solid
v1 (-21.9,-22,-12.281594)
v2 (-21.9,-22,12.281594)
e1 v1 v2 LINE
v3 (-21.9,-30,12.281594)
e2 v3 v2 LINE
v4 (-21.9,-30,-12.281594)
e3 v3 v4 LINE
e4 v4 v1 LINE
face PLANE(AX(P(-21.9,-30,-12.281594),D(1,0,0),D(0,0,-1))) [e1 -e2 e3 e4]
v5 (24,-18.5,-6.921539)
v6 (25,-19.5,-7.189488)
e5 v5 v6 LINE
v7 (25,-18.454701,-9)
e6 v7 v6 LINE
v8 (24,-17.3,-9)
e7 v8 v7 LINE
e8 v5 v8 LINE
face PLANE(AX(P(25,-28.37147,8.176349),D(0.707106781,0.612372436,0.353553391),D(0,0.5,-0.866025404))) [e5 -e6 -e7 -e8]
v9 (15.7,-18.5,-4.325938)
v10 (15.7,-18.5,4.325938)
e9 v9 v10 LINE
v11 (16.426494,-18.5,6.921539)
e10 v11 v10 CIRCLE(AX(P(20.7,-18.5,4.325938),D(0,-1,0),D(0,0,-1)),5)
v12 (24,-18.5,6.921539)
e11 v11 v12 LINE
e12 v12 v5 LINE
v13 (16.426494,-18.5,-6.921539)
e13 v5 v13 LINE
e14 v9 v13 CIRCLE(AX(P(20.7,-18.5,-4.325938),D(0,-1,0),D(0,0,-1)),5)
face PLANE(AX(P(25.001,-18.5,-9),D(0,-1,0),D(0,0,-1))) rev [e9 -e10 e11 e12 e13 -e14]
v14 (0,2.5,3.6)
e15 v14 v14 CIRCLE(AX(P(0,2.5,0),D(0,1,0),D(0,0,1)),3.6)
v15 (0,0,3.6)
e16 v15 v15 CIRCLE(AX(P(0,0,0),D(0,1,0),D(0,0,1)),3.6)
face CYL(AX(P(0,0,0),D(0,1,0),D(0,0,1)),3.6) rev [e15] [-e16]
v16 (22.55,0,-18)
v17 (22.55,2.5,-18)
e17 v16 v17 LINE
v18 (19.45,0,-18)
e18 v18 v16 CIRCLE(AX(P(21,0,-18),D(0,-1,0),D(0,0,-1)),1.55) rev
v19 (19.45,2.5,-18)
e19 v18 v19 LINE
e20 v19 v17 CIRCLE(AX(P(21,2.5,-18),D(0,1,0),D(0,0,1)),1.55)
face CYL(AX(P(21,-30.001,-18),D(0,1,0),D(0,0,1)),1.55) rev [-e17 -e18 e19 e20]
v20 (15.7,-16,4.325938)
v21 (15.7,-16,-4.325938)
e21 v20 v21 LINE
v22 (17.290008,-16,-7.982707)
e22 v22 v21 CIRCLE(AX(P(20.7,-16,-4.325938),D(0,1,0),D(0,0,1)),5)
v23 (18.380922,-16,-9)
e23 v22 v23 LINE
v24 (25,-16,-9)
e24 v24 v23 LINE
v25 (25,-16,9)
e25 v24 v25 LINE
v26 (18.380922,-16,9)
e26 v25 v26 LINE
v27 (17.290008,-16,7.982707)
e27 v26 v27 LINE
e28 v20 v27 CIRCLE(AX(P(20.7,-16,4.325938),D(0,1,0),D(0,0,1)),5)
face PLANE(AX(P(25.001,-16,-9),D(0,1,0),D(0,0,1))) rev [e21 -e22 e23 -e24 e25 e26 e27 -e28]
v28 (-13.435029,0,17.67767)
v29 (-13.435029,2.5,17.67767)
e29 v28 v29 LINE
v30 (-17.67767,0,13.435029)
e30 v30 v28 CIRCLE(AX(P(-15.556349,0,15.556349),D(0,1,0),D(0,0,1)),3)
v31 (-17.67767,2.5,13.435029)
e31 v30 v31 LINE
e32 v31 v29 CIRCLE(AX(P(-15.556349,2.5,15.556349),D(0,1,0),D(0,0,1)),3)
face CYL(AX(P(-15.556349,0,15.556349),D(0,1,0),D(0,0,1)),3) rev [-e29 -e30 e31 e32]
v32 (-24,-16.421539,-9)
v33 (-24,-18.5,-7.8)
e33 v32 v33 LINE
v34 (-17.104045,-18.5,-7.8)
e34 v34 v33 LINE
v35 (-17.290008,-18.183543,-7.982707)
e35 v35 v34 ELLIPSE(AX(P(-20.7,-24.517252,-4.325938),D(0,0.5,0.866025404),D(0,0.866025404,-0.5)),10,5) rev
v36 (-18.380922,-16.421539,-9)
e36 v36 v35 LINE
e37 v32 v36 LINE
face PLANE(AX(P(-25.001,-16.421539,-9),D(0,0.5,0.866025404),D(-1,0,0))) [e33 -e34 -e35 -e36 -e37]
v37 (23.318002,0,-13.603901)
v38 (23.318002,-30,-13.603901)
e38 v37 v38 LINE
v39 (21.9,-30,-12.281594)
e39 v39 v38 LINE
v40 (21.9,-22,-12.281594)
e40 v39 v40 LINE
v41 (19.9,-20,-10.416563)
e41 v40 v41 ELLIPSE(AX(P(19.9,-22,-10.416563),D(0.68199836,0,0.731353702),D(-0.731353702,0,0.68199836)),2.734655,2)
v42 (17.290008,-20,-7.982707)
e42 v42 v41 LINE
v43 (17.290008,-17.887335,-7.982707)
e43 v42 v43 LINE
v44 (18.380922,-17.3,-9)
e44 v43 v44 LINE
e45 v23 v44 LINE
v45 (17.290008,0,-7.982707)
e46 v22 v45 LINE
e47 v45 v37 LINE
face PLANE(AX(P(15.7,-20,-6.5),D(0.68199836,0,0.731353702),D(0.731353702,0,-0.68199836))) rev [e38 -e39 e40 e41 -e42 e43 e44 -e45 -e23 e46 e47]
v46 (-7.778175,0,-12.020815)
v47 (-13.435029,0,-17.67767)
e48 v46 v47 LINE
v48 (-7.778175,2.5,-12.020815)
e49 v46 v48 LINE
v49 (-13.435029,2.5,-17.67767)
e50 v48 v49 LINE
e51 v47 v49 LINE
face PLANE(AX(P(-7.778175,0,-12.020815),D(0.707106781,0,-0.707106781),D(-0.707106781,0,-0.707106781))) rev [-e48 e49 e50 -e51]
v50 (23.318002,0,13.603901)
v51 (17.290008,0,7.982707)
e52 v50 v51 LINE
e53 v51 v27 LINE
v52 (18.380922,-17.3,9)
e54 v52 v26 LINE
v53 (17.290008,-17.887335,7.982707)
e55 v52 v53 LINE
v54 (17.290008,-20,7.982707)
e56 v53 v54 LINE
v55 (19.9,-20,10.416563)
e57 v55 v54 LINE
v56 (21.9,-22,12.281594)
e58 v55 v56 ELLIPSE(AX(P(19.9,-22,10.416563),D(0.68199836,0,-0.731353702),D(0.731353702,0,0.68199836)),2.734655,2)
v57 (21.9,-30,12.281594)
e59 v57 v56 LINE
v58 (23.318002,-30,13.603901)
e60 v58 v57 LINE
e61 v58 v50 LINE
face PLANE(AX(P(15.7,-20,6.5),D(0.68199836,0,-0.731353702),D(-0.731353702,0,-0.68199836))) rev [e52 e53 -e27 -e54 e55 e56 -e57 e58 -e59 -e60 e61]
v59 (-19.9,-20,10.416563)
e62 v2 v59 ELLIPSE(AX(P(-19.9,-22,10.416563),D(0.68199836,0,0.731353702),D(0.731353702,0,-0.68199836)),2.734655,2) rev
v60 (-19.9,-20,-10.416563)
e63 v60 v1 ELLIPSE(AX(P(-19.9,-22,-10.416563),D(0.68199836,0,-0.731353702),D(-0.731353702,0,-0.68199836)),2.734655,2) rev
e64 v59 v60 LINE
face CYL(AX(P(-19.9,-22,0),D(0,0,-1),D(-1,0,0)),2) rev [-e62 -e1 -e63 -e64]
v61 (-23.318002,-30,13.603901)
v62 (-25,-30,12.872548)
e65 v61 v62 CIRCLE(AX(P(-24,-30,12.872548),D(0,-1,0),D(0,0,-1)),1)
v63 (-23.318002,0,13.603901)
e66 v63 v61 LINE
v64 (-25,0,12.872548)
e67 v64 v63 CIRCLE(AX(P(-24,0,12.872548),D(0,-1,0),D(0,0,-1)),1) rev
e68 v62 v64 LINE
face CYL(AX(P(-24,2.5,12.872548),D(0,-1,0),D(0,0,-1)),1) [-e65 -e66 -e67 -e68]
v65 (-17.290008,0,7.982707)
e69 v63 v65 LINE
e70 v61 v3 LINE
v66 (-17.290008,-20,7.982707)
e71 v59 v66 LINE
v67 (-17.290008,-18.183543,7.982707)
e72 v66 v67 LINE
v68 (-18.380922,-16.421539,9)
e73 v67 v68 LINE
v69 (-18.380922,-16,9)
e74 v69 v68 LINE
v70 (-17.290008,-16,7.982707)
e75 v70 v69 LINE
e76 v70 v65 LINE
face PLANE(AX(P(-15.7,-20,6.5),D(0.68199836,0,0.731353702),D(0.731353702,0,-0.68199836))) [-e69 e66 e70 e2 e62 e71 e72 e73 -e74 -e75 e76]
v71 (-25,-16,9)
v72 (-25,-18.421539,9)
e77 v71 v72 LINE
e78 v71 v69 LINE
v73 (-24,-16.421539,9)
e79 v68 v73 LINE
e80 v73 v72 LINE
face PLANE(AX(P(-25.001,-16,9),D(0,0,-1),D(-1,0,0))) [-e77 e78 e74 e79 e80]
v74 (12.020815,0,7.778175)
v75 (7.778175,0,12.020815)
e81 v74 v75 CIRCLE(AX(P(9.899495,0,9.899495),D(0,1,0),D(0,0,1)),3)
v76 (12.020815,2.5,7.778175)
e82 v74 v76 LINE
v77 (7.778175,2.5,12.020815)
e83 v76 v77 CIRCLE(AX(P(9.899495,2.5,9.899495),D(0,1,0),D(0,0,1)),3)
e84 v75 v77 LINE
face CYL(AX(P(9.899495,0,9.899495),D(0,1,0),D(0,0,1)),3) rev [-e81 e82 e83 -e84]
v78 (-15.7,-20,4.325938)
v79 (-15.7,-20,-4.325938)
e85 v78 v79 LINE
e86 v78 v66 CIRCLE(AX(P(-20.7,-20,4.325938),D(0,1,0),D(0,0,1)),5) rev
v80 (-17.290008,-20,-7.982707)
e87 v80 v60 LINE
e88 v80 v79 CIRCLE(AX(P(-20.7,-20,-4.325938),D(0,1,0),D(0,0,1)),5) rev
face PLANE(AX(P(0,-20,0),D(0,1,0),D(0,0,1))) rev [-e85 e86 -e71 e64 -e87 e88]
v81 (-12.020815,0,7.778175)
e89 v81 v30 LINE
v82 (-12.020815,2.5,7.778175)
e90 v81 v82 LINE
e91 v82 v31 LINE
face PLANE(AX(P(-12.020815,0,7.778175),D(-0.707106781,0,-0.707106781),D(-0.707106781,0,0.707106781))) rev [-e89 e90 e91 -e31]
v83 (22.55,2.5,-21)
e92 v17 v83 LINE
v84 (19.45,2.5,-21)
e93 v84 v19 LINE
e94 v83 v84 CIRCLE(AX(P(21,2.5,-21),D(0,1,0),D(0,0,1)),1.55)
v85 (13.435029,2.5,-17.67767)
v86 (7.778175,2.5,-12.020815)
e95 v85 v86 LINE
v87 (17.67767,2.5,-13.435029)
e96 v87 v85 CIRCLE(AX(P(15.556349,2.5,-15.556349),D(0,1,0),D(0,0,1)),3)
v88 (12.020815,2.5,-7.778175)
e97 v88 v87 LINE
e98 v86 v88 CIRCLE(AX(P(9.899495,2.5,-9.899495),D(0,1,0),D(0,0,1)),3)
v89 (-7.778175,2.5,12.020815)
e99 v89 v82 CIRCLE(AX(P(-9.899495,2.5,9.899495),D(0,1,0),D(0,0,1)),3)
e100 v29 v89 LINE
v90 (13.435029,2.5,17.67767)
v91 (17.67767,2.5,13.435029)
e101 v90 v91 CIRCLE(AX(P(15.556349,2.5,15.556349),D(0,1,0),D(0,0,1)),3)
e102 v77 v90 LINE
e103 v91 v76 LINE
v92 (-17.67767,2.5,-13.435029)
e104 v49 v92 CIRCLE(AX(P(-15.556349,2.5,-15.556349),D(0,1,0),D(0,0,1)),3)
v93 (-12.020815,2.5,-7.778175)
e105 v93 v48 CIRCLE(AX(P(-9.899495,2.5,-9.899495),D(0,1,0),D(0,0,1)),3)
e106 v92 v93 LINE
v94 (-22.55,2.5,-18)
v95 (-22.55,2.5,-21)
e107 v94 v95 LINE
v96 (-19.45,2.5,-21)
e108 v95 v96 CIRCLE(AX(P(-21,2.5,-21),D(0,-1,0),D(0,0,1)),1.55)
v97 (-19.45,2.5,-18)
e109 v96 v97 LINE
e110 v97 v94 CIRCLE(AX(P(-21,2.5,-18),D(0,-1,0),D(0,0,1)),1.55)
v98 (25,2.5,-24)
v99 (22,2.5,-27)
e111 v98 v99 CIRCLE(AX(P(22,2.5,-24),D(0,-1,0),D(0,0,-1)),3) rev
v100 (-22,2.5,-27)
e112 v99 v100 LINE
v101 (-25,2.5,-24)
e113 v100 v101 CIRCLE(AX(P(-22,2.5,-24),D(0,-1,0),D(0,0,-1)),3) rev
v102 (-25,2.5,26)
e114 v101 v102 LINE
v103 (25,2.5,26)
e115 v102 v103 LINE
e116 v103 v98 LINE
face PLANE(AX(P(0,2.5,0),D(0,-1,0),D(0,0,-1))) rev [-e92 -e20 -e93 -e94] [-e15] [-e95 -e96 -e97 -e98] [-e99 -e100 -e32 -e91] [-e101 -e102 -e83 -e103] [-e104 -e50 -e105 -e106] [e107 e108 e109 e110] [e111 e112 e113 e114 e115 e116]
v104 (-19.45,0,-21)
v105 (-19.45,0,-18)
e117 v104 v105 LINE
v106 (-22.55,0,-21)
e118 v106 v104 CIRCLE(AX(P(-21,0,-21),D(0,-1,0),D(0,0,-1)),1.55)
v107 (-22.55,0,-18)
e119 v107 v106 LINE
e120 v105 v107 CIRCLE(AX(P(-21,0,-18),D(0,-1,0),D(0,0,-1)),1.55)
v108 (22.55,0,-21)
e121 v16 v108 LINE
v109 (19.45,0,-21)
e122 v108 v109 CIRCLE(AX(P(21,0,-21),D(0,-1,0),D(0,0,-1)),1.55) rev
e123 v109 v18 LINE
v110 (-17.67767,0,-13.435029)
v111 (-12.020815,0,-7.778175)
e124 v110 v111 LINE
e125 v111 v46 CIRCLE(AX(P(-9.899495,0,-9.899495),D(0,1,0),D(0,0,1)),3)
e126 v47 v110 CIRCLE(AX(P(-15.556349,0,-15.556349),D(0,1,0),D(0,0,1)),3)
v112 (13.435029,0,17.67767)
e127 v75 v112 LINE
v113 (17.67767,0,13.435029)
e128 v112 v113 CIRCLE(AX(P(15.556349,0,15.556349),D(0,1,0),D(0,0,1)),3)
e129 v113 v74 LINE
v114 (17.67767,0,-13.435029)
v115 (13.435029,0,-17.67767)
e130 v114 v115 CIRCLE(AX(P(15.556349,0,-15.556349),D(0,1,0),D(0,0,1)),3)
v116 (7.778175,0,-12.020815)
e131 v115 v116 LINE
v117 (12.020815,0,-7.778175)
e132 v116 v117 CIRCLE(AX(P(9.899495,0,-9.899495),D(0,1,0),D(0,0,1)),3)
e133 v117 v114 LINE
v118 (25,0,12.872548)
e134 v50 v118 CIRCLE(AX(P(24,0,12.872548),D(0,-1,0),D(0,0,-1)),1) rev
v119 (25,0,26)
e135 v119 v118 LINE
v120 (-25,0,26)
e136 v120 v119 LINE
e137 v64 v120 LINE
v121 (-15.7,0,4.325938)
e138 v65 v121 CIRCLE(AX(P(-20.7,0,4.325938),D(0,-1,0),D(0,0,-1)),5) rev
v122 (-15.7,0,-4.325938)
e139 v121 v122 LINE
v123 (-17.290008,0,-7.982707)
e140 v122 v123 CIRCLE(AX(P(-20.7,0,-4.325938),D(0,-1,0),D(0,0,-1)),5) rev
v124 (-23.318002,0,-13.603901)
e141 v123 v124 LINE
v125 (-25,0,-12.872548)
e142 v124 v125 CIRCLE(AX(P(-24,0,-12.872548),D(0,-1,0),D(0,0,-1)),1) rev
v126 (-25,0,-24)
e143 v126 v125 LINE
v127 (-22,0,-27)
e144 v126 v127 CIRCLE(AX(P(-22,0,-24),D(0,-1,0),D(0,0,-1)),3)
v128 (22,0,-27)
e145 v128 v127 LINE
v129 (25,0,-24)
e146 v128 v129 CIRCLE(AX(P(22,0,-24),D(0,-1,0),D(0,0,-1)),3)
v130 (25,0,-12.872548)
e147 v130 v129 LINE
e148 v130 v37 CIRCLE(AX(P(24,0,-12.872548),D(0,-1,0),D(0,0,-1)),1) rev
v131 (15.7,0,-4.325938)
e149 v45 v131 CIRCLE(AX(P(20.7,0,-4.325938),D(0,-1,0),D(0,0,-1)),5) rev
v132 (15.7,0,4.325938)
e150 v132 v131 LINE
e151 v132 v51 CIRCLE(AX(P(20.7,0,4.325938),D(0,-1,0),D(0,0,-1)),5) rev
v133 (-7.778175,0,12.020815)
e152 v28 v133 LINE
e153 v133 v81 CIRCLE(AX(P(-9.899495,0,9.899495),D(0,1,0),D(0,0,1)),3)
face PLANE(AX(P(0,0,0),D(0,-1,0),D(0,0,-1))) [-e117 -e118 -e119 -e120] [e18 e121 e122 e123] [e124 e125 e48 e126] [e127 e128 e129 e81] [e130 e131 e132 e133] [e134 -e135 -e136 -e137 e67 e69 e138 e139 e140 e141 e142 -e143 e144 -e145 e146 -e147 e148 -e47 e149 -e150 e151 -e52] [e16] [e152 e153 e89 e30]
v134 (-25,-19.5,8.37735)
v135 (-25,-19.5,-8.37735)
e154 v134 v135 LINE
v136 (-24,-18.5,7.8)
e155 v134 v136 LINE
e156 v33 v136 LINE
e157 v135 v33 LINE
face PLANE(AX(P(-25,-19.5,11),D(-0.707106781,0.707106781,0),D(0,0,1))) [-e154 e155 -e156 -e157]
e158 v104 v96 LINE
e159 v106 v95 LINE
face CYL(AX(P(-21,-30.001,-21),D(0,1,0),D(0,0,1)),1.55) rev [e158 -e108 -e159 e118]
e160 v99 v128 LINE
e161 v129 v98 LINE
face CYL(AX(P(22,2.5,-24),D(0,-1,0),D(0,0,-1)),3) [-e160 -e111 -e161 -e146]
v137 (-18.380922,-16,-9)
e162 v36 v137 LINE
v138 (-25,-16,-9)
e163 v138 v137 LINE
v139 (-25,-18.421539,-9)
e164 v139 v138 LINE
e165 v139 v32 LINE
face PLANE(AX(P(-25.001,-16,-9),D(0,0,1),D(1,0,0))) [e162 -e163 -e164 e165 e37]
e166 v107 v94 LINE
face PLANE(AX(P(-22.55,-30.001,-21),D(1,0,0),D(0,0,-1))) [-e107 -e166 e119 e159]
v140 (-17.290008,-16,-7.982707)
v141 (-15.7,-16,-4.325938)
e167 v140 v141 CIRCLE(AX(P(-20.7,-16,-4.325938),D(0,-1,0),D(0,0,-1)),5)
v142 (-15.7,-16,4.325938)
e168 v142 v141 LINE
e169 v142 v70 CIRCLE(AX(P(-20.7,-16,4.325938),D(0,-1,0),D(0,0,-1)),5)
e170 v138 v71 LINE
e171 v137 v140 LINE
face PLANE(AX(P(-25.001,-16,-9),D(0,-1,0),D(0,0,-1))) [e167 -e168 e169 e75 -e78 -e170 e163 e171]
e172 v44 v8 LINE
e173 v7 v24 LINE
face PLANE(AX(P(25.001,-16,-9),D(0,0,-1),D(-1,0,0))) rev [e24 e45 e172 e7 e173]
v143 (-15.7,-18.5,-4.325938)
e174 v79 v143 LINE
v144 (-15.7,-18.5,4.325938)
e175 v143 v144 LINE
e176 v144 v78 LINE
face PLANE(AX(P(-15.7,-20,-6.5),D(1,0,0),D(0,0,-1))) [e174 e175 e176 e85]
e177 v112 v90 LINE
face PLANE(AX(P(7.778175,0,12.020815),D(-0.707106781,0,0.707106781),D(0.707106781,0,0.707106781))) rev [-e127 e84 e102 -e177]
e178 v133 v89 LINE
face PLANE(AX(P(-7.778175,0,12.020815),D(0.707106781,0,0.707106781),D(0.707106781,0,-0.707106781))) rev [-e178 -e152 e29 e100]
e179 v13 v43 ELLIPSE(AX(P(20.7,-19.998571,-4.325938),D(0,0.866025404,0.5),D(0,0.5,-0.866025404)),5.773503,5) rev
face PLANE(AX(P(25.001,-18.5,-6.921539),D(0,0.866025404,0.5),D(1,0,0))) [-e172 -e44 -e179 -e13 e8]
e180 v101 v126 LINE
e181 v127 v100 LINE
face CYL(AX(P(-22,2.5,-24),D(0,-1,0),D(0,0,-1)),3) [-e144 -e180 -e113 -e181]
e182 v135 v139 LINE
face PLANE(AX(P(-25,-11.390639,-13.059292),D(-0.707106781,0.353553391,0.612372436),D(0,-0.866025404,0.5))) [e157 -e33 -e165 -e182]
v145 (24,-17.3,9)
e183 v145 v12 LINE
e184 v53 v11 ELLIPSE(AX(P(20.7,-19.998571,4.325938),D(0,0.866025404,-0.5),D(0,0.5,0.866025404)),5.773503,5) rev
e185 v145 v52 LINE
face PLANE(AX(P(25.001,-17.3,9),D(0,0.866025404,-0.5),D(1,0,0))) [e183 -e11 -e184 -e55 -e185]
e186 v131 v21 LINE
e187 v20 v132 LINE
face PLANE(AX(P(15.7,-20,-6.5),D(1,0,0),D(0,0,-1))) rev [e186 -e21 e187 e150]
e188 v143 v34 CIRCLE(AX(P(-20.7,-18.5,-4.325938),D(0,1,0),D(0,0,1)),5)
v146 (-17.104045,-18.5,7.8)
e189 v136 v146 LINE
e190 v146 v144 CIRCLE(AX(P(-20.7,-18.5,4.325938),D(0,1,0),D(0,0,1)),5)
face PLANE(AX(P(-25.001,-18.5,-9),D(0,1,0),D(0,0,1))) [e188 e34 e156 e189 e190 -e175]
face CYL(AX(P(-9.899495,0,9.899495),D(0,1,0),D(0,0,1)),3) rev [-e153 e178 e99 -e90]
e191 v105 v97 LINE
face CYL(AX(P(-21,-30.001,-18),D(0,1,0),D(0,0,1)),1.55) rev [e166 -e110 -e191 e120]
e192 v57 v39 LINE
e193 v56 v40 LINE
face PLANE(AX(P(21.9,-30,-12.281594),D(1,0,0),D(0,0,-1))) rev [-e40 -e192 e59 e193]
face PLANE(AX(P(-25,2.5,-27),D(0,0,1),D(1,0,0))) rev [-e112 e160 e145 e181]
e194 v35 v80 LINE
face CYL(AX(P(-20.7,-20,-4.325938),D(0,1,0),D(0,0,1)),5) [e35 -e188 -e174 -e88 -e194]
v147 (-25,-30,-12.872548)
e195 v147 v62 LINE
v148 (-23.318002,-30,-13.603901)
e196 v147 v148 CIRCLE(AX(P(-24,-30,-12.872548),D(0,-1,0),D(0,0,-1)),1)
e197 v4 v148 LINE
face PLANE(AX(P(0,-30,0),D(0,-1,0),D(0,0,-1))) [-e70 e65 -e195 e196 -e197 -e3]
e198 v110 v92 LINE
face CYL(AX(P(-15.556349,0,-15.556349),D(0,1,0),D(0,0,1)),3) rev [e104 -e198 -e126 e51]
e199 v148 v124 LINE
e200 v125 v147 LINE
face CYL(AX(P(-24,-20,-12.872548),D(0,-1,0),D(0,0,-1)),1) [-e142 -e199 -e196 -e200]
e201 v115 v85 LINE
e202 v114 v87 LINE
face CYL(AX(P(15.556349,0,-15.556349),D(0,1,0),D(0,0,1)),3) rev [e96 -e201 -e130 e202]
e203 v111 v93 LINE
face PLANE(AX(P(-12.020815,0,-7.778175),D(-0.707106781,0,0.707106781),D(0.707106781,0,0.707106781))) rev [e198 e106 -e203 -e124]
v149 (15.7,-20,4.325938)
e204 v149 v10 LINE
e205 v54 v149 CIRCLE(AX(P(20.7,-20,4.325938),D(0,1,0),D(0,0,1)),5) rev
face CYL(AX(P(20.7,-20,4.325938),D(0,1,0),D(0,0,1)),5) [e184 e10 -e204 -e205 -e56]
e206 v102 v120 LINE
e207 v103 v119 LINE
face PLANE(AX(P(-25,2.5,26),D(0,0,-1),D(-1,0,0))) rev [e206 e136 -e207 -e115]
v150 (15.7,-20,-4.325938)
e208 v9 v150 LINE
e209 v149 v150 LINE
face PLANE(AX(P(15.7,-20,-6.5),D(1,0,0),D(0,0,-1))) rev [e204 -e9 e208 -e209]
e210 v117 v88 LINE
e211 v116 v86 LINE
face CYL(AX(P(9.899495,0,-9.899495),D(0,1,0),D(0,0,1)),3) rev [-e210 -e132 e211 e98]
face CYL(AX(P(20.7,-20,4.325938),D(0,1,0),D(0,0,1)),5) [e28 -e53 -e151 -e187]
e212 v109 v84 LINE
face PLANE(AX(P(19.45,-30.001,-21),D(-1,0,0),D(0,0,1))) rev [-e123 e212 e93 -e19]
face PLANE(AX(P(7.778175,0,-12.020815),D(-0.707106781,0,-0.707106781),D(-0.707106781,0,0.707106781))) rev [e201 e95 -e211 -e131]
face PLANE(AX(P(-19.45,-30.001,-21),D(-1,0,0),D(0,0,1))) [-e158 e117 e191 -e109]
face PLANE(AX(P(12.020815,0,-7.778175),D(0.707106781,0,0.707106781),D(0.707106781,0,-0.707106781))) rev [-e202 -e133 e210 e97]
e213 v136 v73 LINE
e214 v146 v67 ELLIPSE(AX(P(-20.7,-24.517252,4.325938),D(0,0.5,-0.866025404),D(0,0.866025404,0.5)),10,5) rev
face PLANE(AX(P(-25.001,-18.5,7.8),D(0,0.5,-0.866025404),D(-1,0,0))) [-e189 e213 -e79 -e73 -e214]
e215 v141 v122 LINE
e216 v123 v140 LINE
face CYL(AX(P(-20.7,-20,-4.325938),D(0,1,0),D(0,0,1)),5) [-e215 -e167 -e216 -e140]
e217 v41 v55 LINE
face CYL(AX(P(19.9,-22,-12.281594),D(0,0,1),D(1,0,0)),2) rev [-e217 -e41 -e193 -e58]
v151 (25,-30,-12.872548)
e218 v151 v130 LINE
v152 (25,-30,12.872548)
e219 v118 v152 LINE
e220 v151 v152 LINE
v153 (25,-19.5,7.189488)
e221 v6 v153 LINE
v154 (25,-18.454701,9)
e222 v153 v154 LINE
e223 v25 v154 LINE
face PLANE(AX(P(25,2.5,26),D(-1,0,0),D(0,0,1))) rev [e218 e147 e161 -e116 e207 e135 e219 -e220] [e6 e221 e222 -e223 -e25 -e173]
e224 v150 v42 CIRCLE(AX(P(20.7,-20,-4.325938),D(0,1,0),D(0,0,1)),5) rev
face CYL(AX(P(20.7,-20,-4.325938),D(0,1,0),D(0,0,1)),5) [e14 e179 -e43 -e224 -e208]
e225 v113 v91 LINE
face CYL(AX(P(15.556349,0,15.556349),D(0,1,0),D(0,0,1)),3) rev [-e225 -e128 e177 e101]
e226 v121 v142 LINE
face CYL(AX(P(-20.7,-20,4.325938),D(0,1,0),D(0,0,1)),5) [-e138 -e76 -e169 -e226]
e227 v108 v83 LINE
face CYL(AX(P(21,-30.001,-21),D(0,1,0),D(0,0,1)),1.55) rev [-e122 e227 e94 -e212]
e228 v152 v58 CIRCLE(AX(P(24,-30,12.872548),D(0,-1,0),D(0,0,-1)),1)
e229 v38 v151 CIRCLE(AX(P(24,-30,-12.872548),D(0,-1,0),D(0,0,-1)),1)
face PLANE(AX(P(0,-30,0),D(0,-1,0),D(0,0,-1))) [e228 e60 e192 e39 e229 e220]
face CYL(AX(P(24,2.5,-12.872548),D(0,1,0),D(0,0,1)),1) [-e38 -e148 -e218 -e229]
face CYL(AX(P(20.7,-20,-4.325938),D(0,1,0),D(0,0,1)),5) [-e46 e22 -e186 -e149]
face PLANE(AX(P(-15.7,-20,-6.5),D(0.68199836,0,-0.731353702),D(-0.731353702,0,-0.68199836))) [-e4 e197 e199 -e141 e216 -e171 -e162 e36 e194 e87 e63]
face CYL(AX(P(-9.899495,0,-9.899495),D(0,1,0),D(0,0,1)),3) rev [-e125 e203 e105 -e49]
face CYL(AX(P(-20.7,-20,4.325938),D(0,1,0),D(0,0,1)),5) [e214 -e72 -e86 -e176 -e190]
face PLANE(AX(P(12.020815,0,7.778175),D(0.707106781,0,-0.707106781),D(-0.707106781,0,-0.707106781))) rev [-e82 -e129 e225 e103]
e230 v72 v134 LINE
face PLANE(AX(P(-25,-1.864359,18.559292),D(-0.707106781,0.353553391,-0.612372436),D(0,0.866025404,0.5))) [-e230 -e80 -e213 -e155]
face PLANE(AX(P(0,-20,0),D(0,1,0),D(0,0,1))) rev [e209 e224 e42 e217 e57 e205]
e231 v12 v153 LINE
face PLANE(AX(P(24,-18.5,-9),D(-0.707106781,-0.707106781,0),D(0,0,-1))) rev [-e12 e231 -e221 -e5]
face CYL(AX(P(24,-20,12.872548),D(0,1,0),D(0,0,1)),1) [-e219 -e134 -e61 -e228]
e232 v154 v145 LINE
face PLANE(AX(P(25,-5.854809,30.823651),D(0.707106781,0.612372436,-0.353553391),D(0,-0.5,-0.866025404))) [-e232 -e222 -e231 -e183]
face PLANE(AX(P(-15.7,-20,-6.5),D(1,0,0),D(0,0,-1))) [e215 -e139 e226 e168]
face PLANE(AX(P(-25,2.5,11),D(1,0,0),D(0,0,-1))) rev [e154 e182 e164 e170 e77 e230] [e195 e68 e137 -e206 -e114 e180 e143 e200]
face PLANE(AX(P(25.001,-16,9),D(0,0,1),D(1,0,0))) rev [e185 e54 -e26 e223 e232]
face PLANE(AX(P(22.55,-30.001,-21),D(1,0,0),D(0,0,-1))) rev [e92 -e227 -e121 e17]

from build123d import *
from OCP.BRepFilletAPI import BRepFilletAPI_MakeChamfer

# Parameters (mm, degrees)
DODANIE_WYCI_GNI_CIE2_DEPTH = 2.5
SZKIC6_R                    = 3.6
WYTNIJ_WYCI_GNI_CIE3_DEPTH  = 37.881567212
DODANIE_WYCI_GNI_CIE3_DEPTH = 20
DODANIE_WYCI_GNI_CIE4_DEPTH = 10
ZAOKR_GLENIE1_R             = 1
ZAOKR_GLENIE2_R             = 5
WYTNIJ_WYCI_GNI_CIE1_REACH  = 59.319
SZKIC3_W                    = 18
SZKIC3_H                    = 2.5
SFAZOWANIE1_SIZE            = 1.2
SFAZOWANIE1_SIZE2           = 2.078460969
ZAOKR_GLENIE4_R             = 2
LUSTRO1_START               = -16
LUSTRO1_DEPTH               = 16
LUSTRO1_START_2             = -30
LUSTRO1_2_DEPTH             = 13.578460969
LUSTRO1_START_3             = -22
LUSTRO1_3_DEPTH             = 5.578460969
LUSTRO1_START_4             = -18.183542828
LUSTRO1_4_DEPTH             = 2.183542828
LUSTRO1_START_5             = -12.281593534
LUSTRO1_5_DEPTH             = 24.563187068
LUSTRO1_START_6             = -26
LUSTRO1_6_DEPTH             = 10.3
WYTNIJ_WYCI_GNI_CIE2_REACH  = 51.094
SFAZOWANIE2_SIZE            = 1
ZAOKR_GLENIE3_R             = 3


with BuildPart() as part:
    # Szkic1 → Dodanie-wyciągnięcie2 (new body)
    with BuildSketch(Plane(origin=(0, 0, 0), x_dir=(1, 0, 0), z_dir=(0, 1, 0))):
        Polygon((-25, -11), (-25, -26), (25, -26), (25, -11), (25, 27), (-25, 27), align=None)
    extrude(amount=DODANIE_WYCI_GNI_CIE2_DEPTH)

    # Szkic6 → Wytnij-wyciągnięcie3 (cut, through all)
    with BuildSketch(Plane(origin=(0, 2.5, 0), x_dir=(1, 0, 0), z_dir=(0, 1, 0))):
        with Locations(Location((0, 0, 0), (0, 0, 270))):
            Circle(SZKIC6_R)
        with BuildLine():
            Line((7.778174593, 12.02081528), (13.435028843, 17.67766953))
            ThreePointArc((13.435028843, 17.67766953), (17.67766953, 17.67766953), (17.67766953, 13.435028843))
            Line((17.67766953, 13.435028843), (12.02081528, 7.778174593))
            ThreePointArc((12.02081528, 7.778174593), (7.778174593, 7.778174593), (7.778174593, 12.02081528))
        make_face()
        with BuildLine():
            Line((12.02081528, -7.778174593), (17.67766953, -13.435028843))
            ThreePointArc((17.67766953, -13.435028843), (17.67766953, -17.67766953), (13.435028843, -17.67766953))
            Line((13.435028843, -17.67766953), (7.778174593, -12.02081528))
            ThreePointArc((7.778174593, -12.02081528), (7.778174593, -7.778174593), (12.02081528, -7.778174593))
        make_face()
        with BuildLine():
            Line((-7.778174593, -12.02081528), (-13.435028843, -17.67766953))
            ThreePointArc((-13.435028843, -17.67766953), (-17.67766953, -17.67766953), (-17.67766953, -13.435028843))
            Line((-17.67766953, -13.435028843), (-12.02081528, -7.778174593))
            ThreePointArc((-12.02081528, -7.778174593), (-7.778174593, -7.778174593), (-7.778174593, -12.02081528))
        make_face()
        with BuildLine():
            Line((-12.02081528, 7.778174593), (-17.67766953, 13.435028843))
            ThreePointArc((-17.67766953, 13.435028843), (-17.67766953, 17.67766953), (-13.435028843, 17.67766953))
            Line((-13.435028843, 17.67766953), (-7.778174593, 12.02081528))
            ThreePointArc((-7.778174593, 12.02081528), (-7.778174593, 7.778174593), (-12.02081528, 7.778174593))
        make_face()
    extrude(amount=-WYTNIJ_WYCI_GNI_CIE3_DEPTH, mode=Mode.SUBTRACT)

    # Szkic2 → Dodanie-wyciągnięcie3 (add)
    with BuildSketch(Plane.XZ):
        Polygon((15.7, -6.5), (15.7, 6.5), (25, 15.172390301), (25, -15.172390301), align=None)
    extrude(amount=DODANIE_WYCI_GNI_CIE3_DEPTH)

    # Szkic8 → Dodanie-wyciągnięcie4 (add)
    with BuildSketch(Plane.XZ.offset(20)):
        Polygon((25, 15.172390301), (25, -15.172390301), (21.9, -12.281593534), (21.9, 12.281593534), align=None)
    extrude(amount=DODANIE_WYCI_GNI_CIE4_DEPTH)

    # Zaokrąglenie1
    zaokr_glenie1_edges = [part.edges().sort_by_distance(p)[0] for p in [
        (25, -15, 15.172390301),
        (25, -15, -15.172390301),
    ]]
    fillet(zaokr_glenie1_edges, radius=ZAOKR_GLENIE1_R)

    # Zaokrąglenie2
    zaokr_glenie2_edges = [part.edges().sort_by_distance(p)[0] for p in [
        (15.7, -10, 6.5),
        (15.7, -10, -6.5),
    ]]
    fillet(zaokr_glenie2_edges, radius=ZAOKR_GLENIE2_R)

    # Szkic3 → Wytnij-wyciągnięcie1 (cut, up to next)
    with BuildSketch(Plane.ZY.offset(-15.7), mode=Mode.PRIVATE) as wytnij_wyci_gni_cie1_sk1:
        with Locations((0, -17.25)):
            Rectangle(SZKIC3_W, SZKIC3_H)
    wytnij_wyci_gni_cie1_tool1 = extrude(wytnij_wyci_gni_cie1_sk1.sketch, amount=-WYTNIJ_WYCI_GNI_CIE1_REACH, mode=Mode.PRIVATE) & part.part
    add(wytnij_wyci_gni_cie1_tool1.solids().sort_by_distance((15.7, -17.25, 0))[0], mode=Mode.SUBTRACT)

    # Sfazowanie1: one chamfer whose edges measure the first distance from different faces: ONE call of the kernel's chamfer builder (chamfer() names one face for all edges)
    sfazowanie1_edges_1 = [part.edges().sort_by_distance(p)[0] for p in [
        (21.690460888, -18.5, -9),
    ]]
    sfazowanie1_side_1 = [part.faces().sort_by_distance(p)[0] for p in [
        (21.690460888, -17.25, -9),
    ]]
    sfazowanie1_edges_2 = [part.edges().sort_by_distance(p)[0] for p in [
        (21.690460888, -18.5, 9),
    ]]
    sfazowanie1_side_2 = [part.faces().sort_by_distance(p)[0] for p in [
        (21.690460888, -17.25, 9),
    ]]
    sfazowanie1 = BRepFilletAPI_MakeChamfer(part.part.solid().wrapped)
    for e in sfazowanie1_edges_1:
        sfazowanie1.Add(SFAZOWANIE1_SIZE, SFAZOWANIE1_SIZE2, e.wrapped, sfazowanie1_side_1[0].wrapped)  # the first distance lies on this face
    for e in sfazowanie1_edges_2:
        sfazowanie1.Add(SFAZOWANIE1_SIZE, SFAZOWANIE1_SIZE2, e.wrapped, sfazowanie1_side_2[0].wrapped)  # the first distance lies on this face
    add(Compound.cast(sfazowanie1.Shape()), mode=Mode.REPLACE)

    # Zaokrąglenie4
    zaokr_glenie4_edges = [part.edges().sort_by_distance(p)[0] for p in [
        (21.9, -20, 0),
    ]]
    fillet(zaokr_glenie4_edges, radius=ZAOKR_GLENIE4_R)

    # Lustro1: read off the stored shape, not the designer's step
    # Lustro1 outline → Lustro1 (add)
    with BuildSketch(Plane(origin=(0, 0, 0), x_dir=(1, 0, 0), z_dir=(0, 1, 0)).offset(LUSTRO1_START)):
        with BuildLine():
            ThreePointArc((-25, -12.872547754), (-24.398749069, -13.789607828), (-23.31800164, -13.603901455))
            Line((-23.31800164, -13.603901455), (-17.2900082, -7.982706633))
            ThreePointArc((-17.2900082, -7.982706633), (-16.114699628, -6.31968347), (-15.7, -4.325938125))
            Line((-15.7, -4.325938125), (-15.7, 4.325938125))
            ThreePointArc((-15.7, 4.325938125), (-16.114699628, 6.31968347), (-17.2900082, 7.982706633))
            Line((-17.2900082, 7.982706633), (-23.31800164, 13.603901455))
            ThreePointArc((-23.31800164, 13.603901455), (-24.398749069, 13.789607828), (-25, 12.872547754))
            Line((-25, 12.872547754), (-25, -12.872547754))
        make_face()
    extrude(amount=LUSTRO1_DEPTH)



with BuildPart() as body_2:
    # Lustro1 2 outline → Lustro1 2 (new body)
    with BuildSketch(Plane(origin=(0, 0, 0), x_dir=(1, 0, 0), z_dir=(0, 1, 0)).offset(LUSTRO1_START_2)):
        with BuildLine():
            ThreePointArc((-25, -12.872547754), (-24.398749069, -13.789607828), (-23.31800164, -13.603901455))
            Line((-23.31800164, -13.603901455), (-21.9, -12.281593534))
            Line((-21.9, -12.281593534), (-21.9, 12.281593534))
            Line((-21.9, 12.281593534), (-23.31800164, 13.603901455))
            ThreePointArc((-23.31800164, 13.603901455), (-24.398749069, 13.789607828), (-25, 12.872547754))
            Line((-25, 12.872547754), (-25, -12.872547754))
        make_face()
    extrude(amount=LUSTRO1_2_DEPTH)

    # Lustro1 3 outline → Lustro1 3 (add)
    with BuildSketch(Plane(origin=(0, 0, 0), x_dir=(1, 0, 0), z_dir=(0, 1, 0)).offset(LUSTRO1_START_3)):
        with BuildLine():
            Line((-21.9, -12.281593534), (-17.2900082, -7.982706633))
            ThreePointArc((-17.2900082, -7.982706633), (-16.114699628, -6.31968347), (-15.7, -4.325938125))
            Line((-15.7, -4.325938125), (-15.7, 4.325938125))
            ThreePointArc((-15.7, 4.325938125), (-16.114699628, 6.31968347), (-17.2900082, 7.982706633))
            Line((-17.2900082, 7.982706633), (-21.9, 12.281593534))
            Line((-21.9, 12.281593534), (-21.9, -12.281593534))
        make_face()
    extrude(amount=LUSTRO1_3_DEPTH)


with BuildPart() as part_1:
    add(part.part)

    add(body_2.part)  # Lustro1 4 merges body 2
    # Lustro1 4 outline → Lustro1 4 (add)
    with BuildSketch(Plane(origin=(0, 0, 0), x_dir=(1, 0, 0), z_dir=(0, 1, 0)).offset(LUSTRO1_START_4)):
        with BuildLine():
            Line((-25, -9), (-25, -12.872547754))
            ThreePointArc((-25, -12.872547754), (-24.398749069, -13.789607828), (-23.31800164, -13.603901455))
            Line((-23.31800164, -13.603901455), (-18.380921775, -9))
            Line((-18.380921775, -9), (-25, -9))
        make_face()
        with BuildLine():
            Line((-25, 12.872547754), (-25, 9))
            Line((-25, 9), (-18.380921775, 9))
            Line((-18.380921775, 9), (-23.31800164, 13.603901455))
            ThreePointArc((-23.31800164, 13.603901455), (-24.398749069, 13.789607828), (-25, 12.872547754))
        make_face()
    extrude(amount=LUSTRO1_4_DEPTH)

    # Lustro1 5 outline → Lustro1 5 (cut)
    with BuildSketch(Plane.XY.offset(LUSTRO1_START_5)):
        with BuildLine():
            Line((-15.7, -22), (-15.7, -20))
            Line((-15.7, -20), (-19.9, -20))
            ThreePointArc((-19.9, -20), (-21.314213562, -20.585786438), (-21.9, -22))
            Line((-21.9, -22), (-15.7, -22))
        make_face()
    extrude(amount=LUSTRO1_5_DEPTH, mode=Mode.SUBTRACT)

    # Lustro1 6 outline → Lustro1 6 (cut)
    with BuildSketch(Plane.YZ.offset(LUSTRO1_START_6)):
        Polygon((-18.5, 7.8), (-18.5, -7.8), (-16.421539031, -9), (-16.421539031, 9), align=None)
    extrude(amount=LUSTRO1_6_DEPTH, mode=Mode.SUBTRACT)

    # Szkic5 → Wytnij-wyciągnięcie2 (cut, up to next)
    with BuildSketch(Plane(origin=(0, 2.5, 0), x_dir=(1, 0, 0), z_dir=(0, 1, 0)), mode=Mode.PRIVATE) as wytnij_wyci_gni_cie2_sk1:
        with BuildLine():
            Line((22.55, 21), (22.55, 18))
            ThreePointArc((22.55, 18), (21, 16.45), (19.45, 18))
            Line((19.45, 18), (19.45, 21))
            ThreePointArc((19.45, 21), (21, 22.55), (22.55, 21))
        make_face()
    wytnij_wyci_gni_cie2_tool1 = extrude(wytnij_wyci_gni_cie2_sk1.sketch, amount=-WYTNIJ_WYCI_GNI_CIE2_REACH, mode=Mode.PRIVATE) & part_1.part
    wytnij_wyci_gni_cie2 = wytnij_wyci_gni_cie2_tool1.solids().sort_by_distance((21, 2.5, -19.5))[0]
    add(wytnij_wyci_gni_cie2, mode=Mode.SUBTRACT)

    # Lustro2: Wytnij-wyciągnięcie2 across plane
    add(wytnij_wyci_gni_cie2.mirror(Plane(origin=(0, 0, 0), x_dir=(0, 0, 1), z_dir=(1, 0, 0))), mode=Mode.SUBTRACT)

    # Sfazowanie2
    sfazowanie2_edges = [part_1.edges().sort_by_distance(p)[0] for p in [
        (25, -18.5, 0),
        (25, -17.9, -7.960769515),
        (25, -17.9, 7.960769515),
        (-25, -18.5, 0),
        (-25, -17.460769515, -8.4),
        (-25, -17.460769515, 8.4),
    ]]
    chamfer(sfazowanie2_edges, length=SFAZOWANIE2_SIZE)

    # Zaokrąglenie3
    zaokr_glenie3_edges = [part_1.edges().sort_by_distance(p)[0] for p in [
        (-25, 1.25, -27),
        (25, 1.25, -27),
    ]]
    fillet(zaokr_glenie3_edges, radius=ZAOKR_GLENIE3_R)


solid = part_1.part
